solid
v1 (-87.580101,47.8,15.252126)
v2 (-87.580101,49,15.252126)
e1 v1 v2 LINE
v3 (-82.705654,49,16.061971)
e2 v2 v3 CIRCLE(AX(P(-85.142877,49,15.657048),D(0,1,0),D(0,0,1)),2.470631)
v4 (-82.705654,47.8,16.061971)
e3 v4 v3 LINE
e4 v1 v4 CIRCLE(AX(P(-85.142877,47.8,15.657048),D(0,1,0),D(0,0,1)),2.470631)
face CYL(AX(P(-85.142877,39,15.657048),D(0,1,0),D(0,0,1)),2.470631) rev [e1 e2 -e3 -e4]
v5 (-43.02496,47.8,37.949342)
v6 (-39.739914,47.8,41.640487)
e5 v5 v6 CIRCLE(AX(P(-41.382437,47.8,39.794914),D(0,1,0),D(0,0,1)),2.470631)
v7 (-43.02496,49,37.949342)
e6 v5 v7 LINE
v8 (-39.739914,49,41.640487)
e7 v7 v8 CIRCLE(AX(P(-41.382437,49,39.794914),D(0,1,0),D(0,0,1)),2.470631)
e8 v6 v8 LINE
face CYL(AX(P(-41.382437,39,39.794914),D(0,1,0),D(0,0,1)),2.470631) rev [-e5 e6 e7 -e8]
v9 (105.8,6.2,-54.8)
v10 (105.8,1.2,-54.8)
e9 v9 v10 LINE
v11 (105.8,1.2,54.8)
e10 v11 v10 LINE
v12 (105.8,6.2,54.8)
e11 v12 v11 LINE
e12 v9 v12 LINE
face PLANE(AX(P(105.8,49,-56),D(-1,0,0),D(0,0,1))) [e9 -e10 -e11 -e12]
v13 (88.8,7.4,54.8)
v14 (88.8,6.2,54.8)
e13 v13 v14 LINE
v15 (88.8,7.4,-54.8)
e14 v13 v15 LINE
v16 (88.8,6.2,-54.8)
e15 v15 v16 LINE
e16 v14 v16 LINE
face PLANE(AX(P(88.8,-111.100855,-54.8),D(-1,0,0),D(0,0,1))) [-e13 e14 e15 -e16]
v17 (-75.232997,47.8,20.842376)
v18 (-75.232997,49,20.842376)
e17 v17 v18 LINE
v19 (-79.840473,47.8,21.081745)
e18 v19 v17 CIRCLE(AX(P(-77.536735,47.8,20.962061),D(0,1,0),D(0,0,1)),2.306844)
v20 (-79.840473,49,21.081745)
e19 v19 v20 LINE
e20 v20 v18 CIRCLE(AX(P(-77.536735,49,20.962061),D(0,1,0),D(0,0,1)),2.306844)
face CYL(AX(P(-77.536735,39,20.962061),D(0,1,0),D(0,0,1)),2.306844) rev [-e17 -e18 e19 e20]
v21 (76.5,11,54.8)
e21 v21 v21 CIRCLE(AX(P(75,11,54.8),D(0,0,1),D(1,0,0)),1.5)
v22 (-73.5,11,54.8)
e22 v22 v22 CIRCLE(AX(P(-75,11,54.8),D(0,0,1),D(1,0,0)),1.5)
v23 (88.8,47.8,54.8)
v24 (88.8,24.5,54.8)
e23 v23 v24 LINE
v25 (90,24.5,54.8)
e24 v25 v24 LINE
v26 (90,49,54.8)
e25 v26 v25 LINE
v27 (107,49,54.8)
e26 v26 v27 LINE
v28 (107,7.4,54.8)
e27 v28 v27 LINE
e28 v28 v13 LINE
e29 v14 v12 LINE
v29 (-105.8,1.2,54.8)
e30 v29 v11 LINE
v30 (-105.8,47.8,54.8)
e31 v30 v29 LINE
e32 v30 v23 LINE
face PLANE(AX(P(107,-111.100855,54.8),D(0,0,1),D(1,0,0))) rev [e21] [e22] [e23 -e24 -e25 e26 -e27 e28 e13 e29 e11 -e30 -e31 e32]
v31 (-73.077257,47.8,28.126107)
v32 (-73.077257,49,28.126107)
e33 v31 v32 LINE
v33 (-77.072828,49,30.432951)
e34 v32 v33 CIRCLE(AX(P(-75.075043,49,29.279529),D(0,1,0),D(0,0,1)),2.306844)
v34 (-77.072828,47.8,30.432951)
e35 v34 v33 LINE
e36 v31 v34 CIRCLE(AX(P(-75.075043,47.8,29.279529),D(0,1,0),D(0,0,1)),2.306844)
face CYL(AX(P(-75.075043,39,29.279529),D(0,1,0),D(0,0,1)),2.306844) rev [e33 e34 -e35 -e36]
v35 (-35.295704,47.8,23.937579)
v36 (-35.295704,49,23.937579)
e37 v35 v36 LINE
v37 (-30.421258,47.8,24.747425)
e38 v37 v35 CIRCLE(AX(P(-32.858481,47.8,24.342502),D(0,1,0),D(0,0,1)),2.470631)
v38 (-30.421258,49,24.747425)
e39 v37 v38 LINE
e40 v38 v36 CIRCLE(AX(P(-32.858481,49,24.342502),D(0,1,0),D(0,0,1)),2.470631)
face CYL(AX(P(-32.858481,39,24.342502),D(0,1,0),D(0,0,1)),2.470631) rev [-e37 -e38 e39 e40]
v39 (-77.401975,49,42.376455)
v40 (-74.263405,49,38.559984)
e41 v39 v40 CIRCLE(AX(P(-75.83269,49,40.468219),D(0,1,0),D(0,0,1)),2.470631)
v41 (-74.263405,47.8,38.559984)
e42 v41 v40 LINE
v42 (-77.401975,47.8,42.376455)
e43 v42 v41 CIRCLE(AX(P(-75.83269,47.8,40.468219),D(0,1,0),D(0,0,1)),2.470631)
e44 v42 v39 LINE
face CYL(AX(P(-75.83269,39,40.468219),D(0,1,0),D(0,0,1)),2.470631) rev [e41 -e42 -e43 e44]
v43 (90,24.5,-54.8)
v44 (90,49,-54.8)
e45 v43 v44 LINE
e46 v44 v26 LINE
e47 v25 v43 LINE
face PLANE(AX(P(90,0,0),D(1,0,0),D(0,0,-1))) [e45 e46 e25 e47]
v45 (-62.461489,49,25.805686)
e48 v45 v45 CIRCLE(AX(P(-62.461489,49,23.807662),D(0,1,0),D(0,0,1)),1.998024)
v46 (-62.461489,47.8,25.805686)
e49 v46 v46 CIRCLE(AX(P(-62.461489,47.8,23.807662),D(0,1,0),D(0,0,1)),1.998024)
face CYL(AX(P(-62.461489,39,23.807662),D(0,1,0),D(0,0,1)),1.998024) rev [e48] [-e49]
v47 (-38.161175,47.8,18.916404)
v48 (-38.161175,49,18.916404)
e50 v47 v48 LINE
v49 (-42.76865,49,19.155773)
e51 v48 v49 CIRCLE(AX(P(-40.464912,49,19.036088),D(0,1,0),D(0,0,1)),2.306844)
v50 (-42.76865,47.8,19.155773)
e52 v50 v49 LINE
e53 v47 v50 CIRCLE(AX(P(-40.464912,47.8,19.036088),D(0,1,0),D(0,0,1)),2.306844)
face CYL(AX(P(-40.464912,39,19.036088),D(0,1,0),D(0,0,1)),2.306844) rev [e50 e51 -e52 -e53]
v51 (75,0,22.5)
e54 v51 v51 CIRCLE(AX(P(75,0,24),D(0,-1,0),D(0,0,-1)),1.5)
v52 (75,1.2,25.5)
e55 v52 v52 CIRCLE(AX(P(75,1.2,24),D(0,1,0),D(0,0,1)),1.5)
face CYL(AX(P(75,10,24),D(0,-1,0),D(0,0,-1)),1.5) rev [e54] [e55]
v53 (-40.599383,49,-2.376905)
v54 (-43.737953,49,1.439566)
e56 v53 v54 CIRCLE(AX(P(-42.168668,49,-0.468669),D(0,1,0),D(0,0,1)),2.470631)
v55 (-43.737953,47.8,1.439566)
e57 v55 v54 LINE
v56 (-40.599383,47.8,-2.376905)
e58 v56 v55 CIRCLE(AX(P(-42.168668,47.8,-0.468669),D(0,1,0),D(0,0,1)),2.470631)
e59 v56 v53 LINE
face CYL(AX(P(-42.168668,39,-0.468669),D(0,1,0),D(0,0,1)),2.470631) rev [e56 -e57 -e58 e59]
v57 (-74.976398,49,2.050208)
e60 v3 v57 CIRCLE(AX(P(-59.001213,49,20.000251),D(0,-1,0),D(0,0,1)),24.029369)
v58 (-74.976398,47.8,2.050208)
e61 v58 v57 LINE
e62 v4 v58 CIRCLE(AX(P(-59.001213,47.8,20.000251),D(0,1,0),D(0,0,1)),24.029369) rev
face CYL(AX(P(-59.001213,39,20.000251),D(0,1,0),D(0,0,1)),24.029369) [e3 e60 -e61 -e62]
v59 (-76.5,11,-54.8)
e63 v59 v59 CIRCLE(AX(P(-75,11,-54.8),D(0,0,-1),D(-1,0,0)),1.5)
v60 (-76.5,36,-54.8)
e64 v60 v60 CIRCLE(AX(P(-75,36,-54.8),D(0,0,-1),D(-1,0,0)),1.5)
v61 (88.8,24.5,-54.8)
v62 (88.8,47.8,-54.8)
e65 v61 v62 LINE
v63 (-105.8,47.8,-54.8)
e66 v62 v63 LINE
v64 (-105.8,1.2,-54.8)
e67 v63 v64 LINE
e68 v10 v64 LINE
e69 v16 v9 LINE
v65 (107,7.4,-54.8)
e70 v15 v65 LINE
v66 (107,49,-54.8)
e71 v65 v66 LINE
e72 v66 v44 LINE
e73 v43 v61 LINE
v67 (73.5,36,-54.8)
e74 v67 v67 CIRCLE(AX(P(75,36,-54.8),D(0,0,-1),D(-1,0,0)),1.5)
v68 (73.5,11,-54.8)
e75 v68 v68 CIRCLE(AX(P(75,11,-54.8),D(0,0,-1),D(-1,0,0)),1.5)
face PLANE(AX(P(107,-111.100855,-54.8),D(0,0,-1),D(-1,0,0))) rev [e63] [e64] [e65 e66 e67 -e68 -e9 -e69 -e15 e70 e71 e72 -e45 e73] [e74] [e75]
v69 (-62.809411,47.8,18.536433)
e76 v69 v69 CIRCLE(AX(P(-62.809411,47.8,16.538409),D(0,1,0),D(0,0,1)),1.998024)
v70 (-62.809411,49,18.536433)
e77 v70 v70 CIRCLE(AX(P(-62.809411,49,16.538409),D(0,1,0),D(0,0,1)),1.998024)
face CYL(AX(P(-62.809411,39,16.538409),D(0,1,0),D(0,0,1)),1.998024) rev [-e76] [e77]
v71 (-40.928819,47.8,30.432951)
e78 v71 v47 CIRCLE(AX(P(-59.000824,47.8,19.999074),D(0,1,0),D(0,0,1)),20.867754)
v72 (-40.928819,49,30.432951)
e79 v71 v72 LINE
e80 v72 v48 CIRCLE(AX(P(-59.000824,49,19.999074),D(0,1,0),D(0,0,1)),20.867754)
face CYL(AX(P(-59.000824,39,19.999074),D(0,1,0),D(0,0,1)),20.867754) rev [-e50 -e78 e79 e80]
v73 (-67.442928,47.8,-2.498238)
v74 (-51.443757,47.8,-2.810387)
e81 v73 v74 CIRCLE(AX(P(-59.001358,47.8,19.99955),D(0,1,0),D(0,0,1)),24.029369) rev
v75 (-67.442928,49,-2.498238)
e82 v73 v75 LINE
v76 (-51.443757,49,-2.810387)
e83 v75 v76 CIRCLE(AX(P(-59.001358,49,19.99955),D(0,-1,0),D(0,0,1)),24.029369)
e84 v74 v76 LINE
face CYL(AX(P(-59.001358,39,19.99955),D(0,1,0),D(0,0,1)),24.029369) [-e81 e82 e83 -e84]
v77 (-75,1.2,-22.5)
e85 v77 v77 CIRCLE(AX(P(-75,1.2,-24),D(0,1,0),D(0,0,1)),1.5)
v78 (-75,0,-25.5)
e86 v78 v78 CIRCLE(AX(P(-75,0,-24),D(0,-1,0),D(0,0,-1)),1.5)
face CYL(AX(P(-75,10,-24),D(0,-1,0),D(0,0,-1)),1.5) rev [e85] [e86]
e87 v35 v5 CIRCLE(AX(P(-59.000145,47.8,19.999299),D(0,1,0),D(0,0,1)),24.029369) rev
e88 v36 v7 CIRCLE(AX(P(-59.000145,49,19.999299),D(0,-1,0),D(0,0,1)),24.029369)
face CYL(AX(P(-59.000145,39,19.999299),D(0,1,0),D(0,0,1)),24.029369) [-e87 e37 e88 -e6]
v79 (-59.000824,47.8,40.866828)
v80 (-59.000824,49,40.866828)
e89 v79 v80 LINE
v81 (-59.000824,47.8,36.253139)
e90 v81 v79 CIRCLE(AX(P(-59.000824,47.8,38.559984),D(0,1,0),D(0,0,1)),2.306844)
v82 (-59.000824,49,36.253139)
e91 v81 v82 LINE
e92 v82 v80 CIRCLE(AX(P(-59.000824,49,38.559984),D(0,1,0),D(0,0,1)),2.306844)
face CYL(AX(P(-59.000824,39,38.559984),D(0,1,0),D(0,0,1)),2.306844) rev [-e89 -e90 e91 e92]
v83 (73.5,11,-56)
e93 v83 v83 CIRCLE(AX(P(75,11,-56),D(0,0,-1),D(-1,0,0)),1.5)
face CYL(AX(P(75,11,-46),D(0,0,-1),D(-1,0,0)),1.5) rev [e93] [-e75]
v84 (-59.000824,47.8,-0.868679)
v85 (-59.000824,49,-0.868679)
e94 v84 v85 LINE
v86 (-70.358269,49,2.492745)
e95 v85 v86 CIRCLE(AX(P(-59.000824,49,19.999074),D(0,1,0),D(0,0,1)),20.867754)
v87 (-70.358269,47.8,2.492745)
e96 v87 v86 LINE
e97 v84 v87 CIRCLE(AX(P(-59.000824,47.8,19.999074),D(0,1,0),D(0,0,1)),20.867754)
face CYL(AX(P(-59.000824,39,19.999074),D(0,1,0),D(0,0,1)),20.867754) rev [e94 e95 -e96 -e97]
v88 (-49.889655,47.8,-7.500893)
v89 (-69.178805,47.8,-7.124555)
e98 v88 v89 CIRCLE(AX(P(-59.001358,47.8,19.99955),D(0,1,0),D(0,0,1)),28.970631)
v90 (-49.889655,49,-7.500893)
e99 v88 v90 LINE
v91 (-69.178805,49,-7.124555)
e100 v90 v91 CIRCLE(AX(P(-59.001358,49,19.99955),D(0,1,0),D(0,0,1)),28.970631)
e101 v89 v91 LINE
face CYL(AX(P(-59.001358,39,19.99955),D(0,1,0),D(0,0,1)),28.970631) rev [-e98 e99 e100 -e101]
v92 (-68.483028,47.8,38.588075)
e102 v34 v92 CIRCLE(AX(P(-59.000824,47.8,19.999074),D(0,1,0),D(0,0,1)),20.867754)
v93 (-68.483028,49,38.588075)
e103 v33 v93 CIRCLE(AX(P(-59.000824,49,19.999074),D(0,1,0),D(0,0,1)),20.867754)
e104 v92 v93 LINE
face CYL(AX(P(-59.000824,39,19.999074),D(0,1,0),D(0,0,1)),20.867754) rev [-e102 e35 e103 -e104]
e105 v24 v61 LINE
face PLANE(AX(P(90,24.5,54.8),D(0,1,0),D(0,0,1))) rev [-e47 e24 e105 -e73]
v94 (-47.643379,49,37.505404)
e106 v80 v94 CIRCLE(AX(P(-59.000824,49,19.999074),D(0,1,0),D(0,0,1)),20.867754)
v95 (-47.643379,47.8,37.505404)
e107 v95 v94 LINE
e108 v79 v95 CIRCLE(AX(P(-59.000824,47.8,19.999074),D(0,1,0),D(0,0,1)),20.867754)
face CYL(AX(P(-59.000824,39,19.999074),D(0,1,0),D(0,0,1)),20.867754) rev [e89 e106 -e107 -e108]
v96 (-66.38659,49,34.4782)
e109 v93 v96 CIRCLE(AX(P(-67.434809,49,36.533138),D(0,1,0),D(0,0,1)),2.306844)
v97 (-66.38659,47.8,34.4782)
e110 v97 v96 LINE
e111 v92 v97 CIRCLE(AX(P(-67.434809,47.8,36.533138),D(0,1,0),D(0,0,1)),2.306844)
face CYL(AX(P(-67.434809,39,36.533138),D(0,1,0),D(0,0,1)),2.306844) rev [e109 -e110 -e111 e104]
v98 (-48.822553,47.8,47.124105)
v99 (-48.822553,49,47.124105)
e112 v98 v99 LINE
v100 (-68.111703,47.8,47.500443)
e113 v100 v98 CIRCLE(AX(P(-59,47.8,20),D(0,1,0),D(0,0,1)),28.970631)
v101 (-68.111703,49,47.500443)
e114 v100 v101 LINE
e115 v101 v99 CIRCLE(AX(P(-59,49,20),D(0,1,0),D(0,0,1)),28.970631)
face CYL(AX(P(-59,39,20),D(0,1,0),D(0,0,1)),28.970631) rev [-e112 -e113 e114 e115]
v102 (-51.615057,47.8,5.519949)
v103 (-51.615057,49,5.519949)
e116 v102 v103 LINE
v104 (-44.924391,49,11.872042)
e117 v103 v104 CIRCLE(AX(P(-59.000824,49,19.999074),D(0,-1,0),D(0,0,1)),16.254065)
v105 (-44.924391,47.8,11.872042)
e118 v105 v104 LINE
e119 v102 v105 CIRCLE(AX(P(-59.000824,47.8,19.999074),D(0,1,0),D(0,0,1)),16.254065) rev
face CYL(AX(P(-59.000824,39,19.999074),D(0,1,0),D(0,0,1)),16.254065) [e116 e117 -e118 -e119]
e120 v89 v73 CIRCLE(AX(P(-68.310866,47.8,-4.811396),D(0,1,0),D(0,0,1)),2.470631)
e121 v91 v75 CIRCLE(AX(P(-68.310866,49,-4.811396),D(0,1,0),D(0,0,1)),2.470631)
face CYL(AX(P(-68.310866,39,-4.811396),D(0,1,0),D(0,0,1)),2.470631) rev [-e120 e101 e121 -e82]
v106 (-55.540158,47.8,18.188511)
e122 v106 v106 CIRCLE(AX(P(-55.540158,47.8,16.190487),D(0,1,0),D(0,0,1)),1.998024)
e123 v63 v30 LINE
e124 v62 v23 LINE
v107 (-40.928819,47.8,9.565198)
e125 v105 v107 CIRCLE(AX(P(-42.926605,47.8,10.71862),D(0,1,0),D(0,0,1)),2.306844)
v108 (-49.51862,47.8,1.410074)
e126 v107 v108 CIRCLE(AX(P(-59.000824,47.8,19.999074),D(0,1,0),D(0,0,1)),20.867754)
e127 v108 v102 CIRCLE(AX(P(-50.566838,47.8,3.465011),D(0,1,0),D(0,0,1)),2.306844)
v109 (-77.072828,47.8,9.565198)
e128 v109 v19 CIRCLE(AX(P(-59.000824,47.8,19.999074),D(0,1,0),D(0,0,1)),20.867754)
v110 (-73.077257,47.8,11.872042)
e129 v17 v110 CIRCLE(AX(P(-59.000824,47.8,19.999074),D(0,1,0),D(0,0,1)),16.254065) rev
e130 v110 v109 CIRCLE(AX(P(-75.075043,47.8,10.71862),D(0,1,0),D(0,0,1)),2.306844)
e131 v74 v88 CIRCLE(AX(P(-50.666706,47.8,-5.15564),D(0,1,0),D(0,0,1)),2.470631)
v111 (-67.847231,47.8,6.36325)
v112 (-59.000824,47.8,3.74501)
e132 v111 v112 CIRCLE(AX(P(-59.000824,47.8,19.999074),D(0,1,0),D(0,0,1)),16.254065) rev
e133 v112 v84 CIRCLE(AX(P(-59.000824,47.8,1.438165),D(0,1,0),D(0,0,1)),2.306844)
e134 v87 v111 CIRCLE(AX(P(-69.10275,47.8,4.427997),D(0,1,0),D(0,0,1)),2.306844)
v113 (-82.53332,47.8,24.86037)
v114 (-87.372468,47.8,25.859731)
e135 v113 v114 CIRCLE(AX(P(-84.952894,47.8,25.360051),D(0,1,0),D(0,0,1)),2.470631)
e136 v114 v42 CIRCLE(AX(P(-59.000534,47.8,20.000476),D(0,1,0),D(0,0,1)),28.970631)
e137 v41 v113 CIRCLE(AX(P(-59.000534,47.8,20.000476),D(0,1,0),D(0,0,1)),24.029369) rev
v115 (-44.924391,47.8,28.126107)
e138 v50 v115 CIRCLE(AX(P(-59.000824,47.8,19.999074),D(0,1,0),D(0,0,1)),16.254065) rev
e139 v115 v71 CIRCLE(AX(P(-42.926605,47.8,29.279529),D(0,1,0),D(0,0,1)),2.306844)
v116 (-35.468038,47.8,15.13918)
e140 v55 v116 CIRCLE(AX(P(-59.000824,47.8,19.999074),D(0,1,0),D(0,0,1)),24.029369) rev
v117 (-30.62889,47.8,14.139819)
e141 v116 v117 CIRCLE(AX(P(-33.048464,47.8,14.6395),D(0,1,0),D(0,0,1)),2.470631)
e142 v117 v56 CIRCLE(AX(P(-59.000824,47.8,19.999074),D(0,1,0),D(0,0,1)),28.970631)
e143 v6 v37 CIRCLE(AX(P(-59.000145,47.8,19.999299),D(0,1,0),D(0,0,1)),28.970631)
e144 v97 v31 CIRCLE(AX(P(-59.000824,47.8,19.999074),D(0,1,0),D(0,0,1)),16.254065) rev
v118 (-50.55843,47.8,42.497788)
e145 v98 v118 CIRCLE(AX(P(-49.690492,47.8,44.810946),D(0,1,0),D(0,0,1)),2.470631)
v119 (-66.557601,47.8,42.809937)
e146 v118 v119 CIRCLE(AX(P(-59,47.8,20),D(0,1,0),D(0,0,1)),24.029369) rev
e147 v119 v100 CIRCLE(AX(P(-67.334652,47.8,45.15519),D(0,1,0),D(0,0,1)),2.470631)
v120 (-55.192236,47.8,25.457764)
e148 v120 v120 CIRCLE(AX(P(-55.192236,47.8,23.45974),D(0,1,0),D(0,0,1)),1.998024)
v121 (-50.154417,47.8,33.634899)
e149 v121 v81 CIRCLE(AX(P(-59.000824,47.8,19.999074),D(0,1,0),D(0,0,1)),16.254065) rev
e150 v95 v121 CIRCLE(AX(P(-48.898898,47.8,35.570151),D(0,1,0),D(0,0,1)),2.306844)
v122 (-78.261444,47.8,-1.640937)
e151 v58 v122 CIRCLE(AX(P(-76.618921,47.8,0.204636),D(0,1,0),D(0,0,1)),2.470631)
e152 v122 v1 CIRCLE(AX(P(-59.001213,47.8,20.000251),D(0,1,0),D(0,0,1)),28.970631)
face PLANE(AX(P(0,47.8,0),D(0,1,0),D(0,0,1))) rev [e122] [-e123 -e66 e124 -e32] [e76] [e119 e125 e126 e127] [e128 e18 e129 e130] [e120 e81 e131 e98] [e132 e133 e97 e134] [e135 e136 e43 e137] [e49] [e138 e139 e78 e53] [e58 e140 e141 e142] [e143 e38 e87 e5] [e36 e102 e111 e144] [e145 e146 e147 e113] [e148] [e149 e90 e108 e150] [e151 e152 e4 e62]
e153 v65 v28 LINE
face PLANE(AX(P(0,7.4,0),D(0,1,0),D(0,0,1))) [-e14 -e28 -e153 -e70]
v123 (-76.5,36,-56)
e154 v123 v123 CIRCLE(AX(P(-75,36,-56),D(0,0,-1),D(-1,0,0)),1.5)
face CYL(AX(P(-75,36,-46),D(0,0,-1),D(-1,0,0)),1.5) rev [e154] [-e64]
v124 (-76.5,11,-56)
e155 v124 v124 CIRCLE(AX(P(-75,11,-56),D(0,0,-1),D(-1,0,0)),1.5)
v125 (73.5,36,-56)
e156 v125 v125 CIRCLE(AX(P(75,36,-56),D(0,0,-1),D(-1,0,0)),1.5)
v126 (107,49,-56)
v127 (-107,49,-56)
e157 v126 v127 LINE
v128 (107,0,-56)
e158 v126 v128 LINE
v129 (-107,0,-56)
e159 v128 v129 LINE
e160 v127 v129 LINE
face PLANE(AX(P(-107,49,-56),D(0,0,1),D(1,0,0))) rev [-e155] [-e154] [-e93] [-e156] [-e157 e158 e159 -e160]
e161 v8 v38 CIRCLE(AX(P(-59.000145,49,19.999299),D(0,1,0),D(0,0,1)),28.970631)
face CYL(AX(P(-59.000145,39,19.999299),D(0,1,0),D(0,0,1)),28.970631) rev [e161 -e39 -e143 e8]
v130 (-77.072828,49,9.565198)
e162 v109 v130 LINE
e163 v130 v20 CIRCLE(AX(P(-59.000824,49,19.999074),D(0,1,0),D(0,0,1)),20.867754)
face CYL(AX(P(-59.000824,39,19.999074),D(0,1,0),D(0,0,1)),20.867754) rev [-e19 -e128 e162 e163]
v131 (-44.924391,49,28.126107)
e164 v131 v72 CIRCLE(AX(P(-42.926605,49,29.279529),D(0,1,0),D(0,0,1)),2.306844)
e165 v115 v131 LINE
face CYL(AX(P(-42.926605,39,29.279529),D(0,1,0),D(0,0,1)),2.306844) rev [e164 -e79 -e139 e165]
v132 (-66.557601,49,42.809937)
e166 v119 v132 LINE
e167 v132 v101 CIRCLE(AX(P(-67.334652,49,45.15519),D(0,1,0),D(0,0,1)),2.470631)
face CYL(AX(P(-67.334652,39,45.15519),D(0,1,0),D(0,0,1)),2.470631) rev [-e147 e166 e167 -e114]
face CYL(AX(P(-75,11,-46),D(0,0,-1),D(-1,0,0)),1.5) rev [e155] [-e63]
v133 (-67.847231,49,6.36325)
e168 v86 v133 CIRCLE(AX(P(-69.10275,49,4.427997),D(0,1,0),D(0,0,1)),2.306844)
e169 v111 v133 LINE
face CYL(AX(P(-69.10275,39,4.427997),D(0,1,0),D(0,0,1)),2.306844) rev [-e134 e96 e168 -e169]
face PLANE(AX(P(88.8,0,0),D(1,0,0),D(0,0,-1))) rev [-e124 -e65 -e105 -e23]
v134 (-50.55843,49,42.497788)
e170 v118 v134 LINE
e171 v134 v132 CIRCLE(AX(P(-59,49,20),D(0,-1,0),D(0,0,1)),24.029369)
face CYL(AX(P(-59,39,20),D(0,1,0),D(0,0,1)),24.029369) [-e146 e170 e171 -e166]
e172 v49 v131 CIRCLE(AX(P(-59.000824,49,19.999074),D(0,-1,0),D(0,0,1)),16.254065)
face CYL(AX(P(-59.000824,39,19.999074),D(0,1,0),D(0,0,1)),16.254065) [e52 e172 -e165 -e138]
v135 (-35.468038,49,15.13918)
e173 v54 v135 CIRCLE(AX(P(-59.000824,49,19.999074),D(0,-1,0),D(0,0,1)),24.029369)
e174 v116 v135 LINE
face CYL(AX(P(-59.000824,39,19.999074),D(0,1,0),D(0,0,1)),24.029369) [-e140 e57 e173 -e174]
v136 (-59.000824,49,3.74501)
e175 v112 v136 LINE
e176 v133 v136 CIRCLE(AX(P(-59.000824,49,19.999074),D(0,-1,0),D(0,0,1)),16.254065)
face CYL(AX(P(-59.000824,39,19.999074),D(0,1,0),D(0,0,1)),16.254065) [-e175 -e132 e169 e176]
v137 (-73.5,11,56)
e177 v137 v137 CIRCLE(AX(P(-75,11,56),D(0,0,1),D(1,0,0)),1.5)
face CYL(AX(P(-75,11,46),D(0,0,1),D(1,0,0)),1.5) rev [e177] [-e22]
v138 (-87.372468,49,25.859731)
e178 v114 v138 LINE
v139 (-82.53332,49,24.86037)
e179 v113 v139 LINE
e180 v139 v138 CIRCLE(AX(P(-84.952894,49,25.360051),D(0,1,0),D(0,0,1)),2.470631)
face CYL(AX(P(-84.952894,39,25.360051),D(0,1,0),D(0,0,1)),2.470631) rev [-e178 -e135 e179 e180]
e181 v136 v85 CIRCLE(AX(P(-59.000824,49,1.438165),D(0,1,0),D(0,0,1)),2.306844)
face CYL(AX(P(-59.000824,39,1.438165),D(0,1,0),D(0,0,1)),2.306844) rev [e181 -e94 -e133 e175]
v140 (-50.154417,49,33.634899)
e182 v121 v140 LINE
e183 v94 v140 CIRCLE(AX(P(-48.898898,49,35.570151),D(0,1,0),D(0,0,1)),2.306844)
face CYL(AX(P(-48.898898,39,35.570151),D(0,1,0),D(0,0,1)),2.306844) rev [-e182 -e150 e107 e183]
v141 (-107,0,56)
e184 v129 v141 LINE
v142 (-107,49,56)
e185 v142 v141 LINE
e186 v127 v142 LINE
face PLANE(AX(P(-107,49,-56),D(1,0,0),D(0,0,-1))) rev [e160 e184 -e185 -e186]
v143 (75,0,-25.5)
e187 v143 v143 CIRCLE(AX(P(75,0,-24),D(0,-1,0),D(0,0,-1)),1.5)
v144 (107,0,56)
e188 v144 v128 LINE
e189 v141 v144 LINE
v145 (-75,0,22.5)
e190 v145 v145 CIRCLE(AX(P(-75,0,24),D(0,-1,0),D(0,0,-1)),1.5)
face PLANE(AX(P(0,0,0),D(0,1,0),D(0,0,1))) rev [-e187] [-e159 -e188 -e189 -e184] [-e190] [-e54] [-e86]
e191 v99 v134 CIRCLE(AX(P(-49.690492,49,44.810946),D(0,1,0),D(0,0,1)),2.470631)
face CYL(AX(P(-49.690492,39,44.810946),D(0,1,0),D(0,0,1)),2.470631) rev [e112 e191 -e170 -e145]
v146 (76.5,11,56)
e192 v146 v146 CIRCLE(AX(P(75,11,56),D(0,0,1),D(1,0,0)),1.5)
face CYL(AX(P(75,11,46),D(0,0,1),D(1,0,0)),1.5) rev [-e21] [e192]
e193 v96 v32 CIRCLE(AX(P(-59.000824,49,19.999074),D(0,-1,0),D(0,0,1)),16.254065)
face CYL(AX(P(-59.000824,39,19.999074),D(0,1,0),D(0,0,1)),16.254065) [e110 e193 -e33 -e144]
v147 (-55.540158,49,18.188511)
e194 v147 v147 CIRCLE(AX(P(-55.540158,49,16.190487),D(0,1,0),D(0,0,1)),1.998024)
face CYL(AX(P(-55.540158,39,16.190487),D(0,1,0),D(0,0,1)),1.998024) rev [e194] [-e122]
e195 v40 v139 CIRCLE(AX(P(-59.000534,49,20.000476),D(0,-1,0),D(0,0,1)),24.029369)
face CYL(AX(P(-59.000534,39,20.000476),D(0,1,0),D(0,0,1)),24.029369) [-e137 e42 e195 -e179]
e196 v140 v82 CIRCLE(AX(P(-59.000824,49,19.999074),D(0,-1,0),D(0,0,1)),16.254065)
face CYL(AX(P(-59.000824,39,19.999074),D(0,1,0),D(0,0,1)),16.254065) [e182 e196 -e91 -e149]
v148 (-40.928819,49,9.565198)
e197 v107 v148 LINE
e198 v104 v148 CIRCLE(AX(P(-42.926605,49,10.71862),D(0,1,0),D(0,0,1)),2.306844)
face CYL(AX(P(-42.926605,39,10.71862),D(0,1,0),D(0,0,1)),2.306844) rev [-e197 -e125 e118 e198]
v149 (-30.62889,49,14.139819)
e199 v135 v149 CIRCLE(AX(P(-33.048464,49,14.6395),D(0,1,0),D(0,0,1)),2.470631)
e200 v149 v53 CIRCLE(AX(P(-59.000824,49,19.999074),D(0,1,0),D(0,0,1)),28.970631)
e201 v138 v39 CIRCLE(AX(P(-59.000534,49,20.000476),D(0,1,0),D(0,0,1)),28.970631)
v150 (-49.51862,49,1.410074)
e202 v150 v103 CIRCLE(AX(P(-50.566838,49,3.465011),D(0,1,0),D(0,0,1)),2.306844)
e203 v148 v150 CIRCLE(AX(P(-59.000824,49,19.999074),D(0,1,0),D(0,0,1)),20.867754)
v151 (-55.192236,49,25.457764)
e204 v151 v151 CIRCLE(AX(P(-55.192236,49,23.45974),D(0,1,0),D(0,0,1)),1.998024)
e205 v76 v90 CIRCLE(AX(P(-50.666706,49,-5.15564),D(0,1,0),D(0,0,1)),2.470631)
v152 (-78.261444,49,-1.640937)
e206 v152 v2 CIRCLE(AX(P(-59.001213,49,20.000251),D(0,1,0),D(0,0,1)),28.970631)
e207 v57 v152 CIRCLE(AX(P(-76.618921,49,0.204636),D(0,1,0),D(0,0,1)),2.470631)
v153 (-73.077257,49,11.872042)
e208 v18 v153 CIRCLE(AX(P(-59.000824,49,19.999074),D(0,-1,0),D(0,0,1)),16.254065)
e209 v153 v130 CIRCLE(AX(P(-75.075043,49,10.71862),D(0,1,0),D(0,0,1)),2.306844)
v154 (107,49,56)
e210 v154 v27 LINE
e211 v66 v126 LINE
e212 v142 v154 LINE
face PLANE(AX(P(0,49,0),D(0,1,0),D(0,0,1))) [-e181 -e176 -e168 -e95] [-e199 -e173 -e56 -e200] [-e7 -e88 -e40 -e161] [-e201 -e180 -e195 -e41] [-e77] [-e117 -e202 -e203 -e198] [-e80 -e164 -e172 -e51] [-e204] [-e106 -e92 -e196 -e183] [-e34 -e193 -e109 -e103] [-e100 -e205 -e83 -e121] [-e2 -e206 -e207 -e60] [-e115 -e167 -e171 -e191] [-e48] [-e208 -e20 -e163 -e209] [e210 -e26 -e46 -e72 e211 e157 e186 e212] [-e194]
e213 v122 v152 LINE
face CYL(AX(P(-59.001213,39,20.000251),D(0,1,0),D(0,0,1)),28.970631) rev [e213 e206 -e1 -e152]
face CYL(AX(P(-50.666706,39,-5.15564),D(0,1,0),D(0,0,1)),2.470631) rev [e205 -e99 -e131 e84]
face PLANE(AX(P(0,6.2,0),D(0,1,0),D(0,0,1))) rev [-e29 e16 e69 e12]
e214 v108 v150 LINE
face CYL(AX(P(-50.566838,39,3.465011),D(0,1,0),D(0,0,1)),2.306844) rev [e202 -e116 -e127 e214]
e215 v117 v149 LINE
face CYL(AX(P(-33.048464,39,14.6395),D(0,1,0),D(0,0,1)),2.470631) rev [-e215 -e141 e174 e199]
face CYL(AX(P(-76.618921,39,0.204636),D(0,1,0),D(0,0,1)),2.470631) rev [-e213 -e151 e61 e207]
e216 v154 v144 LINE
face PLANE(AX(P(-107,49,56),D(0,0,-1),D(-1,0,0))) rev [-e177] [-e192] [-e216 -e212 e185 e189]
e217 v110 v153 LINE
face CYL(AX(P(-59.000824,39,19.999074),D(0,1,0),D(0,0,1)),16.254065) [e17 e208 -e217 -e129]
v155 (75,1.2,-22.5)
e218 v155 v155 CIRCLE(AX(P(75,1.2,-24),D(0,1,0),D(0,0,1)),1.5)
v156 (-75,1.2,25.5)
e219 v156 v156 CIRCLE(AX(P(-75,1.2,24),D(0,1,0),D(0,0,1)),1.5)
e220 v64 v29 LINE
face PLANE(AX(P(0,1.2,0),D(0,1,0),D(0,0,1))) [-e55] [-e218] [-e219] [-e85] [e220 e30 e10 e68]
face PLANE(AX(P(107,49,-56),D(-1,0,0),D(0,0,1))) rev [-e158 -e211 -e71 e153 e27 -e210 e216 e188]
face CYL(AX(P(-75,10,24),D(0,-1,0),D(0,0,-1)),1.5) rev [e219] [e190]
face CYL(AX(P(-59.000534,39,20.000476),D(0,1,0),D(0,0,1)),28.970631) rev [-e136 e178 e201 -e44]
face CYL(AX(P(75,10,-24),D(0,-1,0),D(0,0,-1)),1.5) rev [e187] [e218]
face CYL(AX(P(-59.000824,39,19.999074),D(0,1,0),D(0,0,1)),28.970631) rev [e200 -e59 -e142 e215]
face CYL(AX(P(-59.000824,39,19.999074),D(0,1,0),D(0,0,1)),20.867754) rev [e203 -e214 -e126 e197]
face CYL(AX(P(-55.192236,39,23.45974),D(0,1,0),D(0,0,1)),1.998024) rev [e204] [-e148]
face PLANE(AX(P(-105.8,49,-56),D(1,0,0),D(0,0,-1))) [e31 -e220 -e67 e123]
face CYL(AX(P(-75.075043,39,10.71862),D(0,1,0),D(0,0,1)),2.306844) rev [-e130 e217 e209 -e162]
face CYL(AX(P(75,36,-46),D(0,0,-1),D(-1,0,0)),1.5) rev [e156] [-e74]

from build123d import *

# Parameters (mm, degrees)
SKETCH1_W           = 214
SKETCH1_H           = 112
BOSS_EXTRUDE1_DEPTH = 49
SKETCH2_W           = 18.2
SKETCH2_H           = 109.6
CUT_EXTRUDE1_DEPTH  = 41.6
SHELL1_START        = -54.8
SHELL1_DEPTH        = 109.6
SKETCH3_R           = 1.5
CUT_EXTRUDE2_DEPTH  = 10
CUT_EXTRUDE3_START  = -10
SKETCH4_R           = 1.5
CUT_EXTRUDE3_DEPTH  = 10
SKETCH5_W           = 109.6
SKETCH5_H           = 24.5
BOSS_EXTRUDE2_DEPTH = 1.2
SKETCH6_R           = 1.998023928
CUT_EXTRUDE5_DEPTH  = 10
SKETCH7_R           = 1.5
CUT_EXTRUDE6_DEPTH  = 10


# Read off the part's stored shape, not the designer's step: Shell1
with BuildPart() as part:
    # Sketch1 → Boss-Extrude1 (new body)
    with BuildSketch(Plane(origin=(0, 0, 0), x_dir=(1, 0, 0), z_dir=(0, 1, 0))):
        Rectangle(SKETCH1_W, SKETCH1_H)
    extrude(amount=BOSS_EXTRUDE1_DEPTH)

    # Sketch2 → Cut-Extrude1 (cut)
    with BuildSketch(Plane(origin=(0, 49, 0), x_dir=(1, 0, 0), z_dir=(0, 1, 0))):
        with Locations((97.9, 0)):
            Rectangle(SKETCH2_W, SKETCH2_H)
    extrude(amount=-CUT_EXTRUDE1_DEPTH, mode=Mode.SUBTRACT)

    # Shell1 outline → Shell1 (cut)
    with BuildSketch(Plane.XY.offset(SHELL1_START)):
        Polygon((88.8, 6.2), (88.8, 47.8), (-105.8, 47.8), (-105.8, 1.2), (105.8, 1.2), (105.8, 6.2), align=None)
    extrude(amount=SHELL1_DEPTH, mode=Mode.SUBTRACT)

    # Sketch3 → Cut-Extrude2 (cut)
    with BuildSketch(Plane.XY.offset(56)):
        with Locations((75, 11)):
            Circle(SKETCH3_R)
        with Locations((-75, 11)):
            Circle(SKETCH3_R)
    extrude(amount=-CUT_EXTRUDE2_DEPTH, mode=Mode.SUBTRACT)

    # Sketch4 → Cut-Extrude3 (cut)
    with BuildSketch(Plane(origin=(0, 0, -56), x_dir=(-1, 0, 0), z_dir=(0, 0, -1)).offset(CUT_EXTRUDE3_START)):
        with Locations(Location((-75, 11, 0), (0, 0, 180))):
            Circle(SKETCH4_R)
        with Locations((-75, 36)):
            Circle(SKETCH4_R)
        with Locations((75, 36)):
            Circle(SKETCH4_R)
        with Locations(Location((75, 11, 0), (0, 0, 180))):
            Circle(SKETCH4_R)
    extrude(amount=CUT_EXTRUDE3_DEPTH, mode=Mode.SUBTRACT)

    # Sketch5 → Boss-Extrude2 (add)
    with BuildSketch(Plane(origin=(88.8, 0, 0), x_dir=(0, 0, -1), z_dir=(1, 0, 0))):
        with Locations((0, 36.75)):
            Rectangle(SKETCH5_W, SKETCH5_H)
    extrude(amount=BOSS_EXTRUDE2_DEPTH)

    # Sketch6 → Cut-Extrude5 (cut)
    with BuildSketch(Plane(origin=(0, 49, 0), x_dir=(1, 0, 0), z_dir=(0, 1, 0))):
        with Locations(Location((-55.192236422, -23.459739828, 0), (0, 0, 270))):
            Circle(SKETCH6_R)
        with Locations(Location((-62.461489091, -23.807661774, 0), (0, 0, 270))):
            Circle(SKETCH6_R)
        with Locations(Location((-62.809411037, -16.538409104, 0), (0, 0, 270))):
            Circle(SKETCH6_R)
        with Locations(Location((-55.540158368, -16.190487158, 0), (0, 0, 270))):
            Circle(SKETCH6_R)
        with BuildLine():
            ThreePointArc((-68.111702611, -47.500442825), (-58.4348804, -48.96511902), (-48.822553365, -47.124104778))
            ThreePointArc((-48.822553365, -47.124104778), (-47.37733306, -43.943008007), (-50.558429832, -42.497787702))
            ThreePointArc((-50.558429832, -42.497787702), (-58.531267819, -44.024796535), (-66.557600615, -42.809937118))
            ThreePointArc((-66.557600615, -42.809937118), (-69.679904466, -44.378138973), (-68.111702611, -47.500442825))
        make_face()
        with BuildLine():
            ThreePointArc((-87.372467764, -25.85973106), (-83.802503452, -34.97244302), (-77.401974833, -42.376455301))
            ThreePointArc((-77.401974833, -42.376455301), (-73.924454064, -42.037504413), (-74.263404952, -38.559983645))
            ThreePointArc((-74.263404952, -38.559983645), (-79.572252387, -32.418807824), (-82.533319668, -24.860370016))
            ThreePointArc((-82.533319668, -24.860370016), (-85.452574238, -22.940476489), (-87.372467764, -25.85973106))
        make_face()
        with BuildLine():
            ThreePointArc((-78.261444197, 1.640936741), (-84.368302096, -6.007099023), (-87.580100511, -15.252125546))
            ThreePointArc((-87.580100511, -15.252125546), (-85.547800047, -18.09427143), (-82.705654164, -16.061970966))
            ThreePointArc((-82.705654164, -16.061970966), (-80.041663611, -8.393786313), (-74.976398096, -2.050207921))
            ThreePointArc((-74.976398096, -2.050207921), (-74.773348815, 1.437887461), (-78.261444197, 1.640936741))
        make_face()
        with BuildLine():
            ThreePointArc((-49.889655476, 7.500892778), (-59.566477687, 8.965568974), (-69.178804722, 7.124554732))
            ThreePointArc((-69.178804722, 7.124554732), (-70.624025026, 3.94345796), (-67.442928255, 2.498237655))
            ThreePointArc((-67.442928255, 2.498237655), (-59.470090268, 4.025246488), (-51.443757472, 2.810387072))
            ThreePointArc((-51.443757472, 2.810387072), (-48.321453621, 4.378588927), (-49.889655476, 7.500892778))
        make_face()
        with BuildLine():
            ThreePointArc((-30.628890323, -14.139818987), (-34.198854634, -5.027107026), (-40.599383254, 2.376905254))
            ThreePointArc((-40.599383254, 2.376905254), (-44.076904022, 2.037954367), (-43.737953135, -1.439566401))
            ThreePointArc((-43.737953135, -1.439566401), (-38.4291057, -7.580742222), (-35.468038419, -15.139180031))
            ThreePointArc((-35.468038419, -15.139180031), (-32.548783849, -17.059073557), (-30.628890323, -14.139818987))
        make_face()
        with BuildLine():
            ThreePointArc((-39.73991389, -41.640486788), (-33.633055991, -33.992451023), (-30.421257576, -24.7474245))
            ThreePointArc((-30.421257576, -24.7474245), (-32.453558039, -21.905278617), (-35.295703923, -23.93757908))
            ThreePointArc((-35.295703923, -23.93757908), (-37.959694476, -31.605763734), (-43.02495999, -37.949342126))
            ThreePointArc((-43.02495999, -37.949342126), (-43.228009271, -41.437437507), (-39.73991389, -41.640486788))
        make_face()
        with BuildLine():
            ThreePointArc((-59.000823729, -40.866828037), (-53.078604467, -40.008833538), (-47.643378837, -37.505404311))
            ThreePointArc((-47.643378837, -37.505404311), (-46.963644877, -34.314632642), (-50.154416546, -33.634898681))
            ThreePointArc((-50.154416546, -33.634898681), (-54.387958467, -35.584840284), (-59.000823729, -36.253139252))
            ThreePointArc((-59.000823729, -36.253139252), (-61.307668122, -38.559983645), (-59.000823729, -40.866828037))
        make_face()
        with BuildLine():
            ThreePointArc((-77.072828442, -30.432951252), (-73.368673779, -35.13274633), (-68.483027656, -38.588075187))
            ThreePointArc((-68.483027656, -38.588075187), (-65.379871353, -37.58135623), (-66.38659031, -34.478199926))
            ThreePointArc((-66.38659031, -34.478199926), (-70.192060234, -31.786815877), (-73.077256749, -28.126106859))
            ThreePointArc((-73.077256749, -28.126106859), (-76.228464792, -27.281743209), (-77.072828442, -30.432951252))
        make_face()
        with BuildLine():
            ThreePointArc((-77.072828442, -9.56519768), (-79.290893041, -15.122987258), (-79.840472548, -21.081745342))
            ThreePointArc((-79.840472548, -21.081745342), (-77.417050205, -23.265798054), (-75.232997493, -20.842375711))
            ThreePointArc((-75.232997493, -20.842375711), (-74.804925497, -16.201050059), (-73.077256749, -11.872042073))
            ThreePointArc((-73.077256749, -11.872042073), (-73.921620399, -8.72083403), (-77.072828442, -9.56519768))
        make_face()
        with BuildLine():
            ThreePointArc((-59.000823729, 0.868679105), (-64.923042991, 0.010684606), (-70.358268622, -2.492744621))
            ThreePointArc((-70.358268622, -2.492744621), (-71.038002582, -5.68351629), (-67.847230912, -6.36325025))
            ThreePointArc((-67.847230912, -6.36325025), (-63.613688992, -4.413308647), (-59.000823729, -3.74500968))
            ThreePointArc((-59.000823729, -3.74500968), (-56.693979337, -1.438165287), (-59.000823729, 0.868679105))
        make_face()
        with BuildLine():
            ThreePointArc((-40.928819017, -9.56519768), (-44.63297368, -4.865402602), (-49.518619803, -1.410073745))
            ThreePointArc((-49.518619803, -1.410073745), (-52.621776106, -2.416792702), (-51.615057149, -5.519949006))
            ThreePointArc((-51.615057149, -5.519949006), (-47.809587225, -8.211333055), (-44.92439071, -11.872042073))
            ThreePointArc((-44.92439071, -11.872042073), (-41.773182667, -12.716405723), (-40.928819017, -9.56519768))
        make_face()
        with BuildLine():
            ThreePointArc((-40.928819017, -30.432951252), (-38.710754418, -24.875161674), (-38.161174911, -18.91640359))
            ThreePointArc((-38.161174911, -18.91640359), (-40.584597254, -16.732350878), (-42.768649966, -19.155773221))
            ThreePointArc((-42.768649966, -19.155773221), (-43.196721962, -23.797098873), (-44.92439071, -28.126106859))
            ThreePointArc((-44.92439071, -28.126106859), (-44.080027059, -31.277314902), (-40.928819017, -30.432951252))
        make_face()
    extrude(amount=-CUT_EXTRUDE5_DEPTH, mode=Mode.SUBTRACT)

    # Sketch7 → Cut-Extrude6 (cut)
    with BuildSketch(Plane.XZ):
        with Locations(Location((-75, 24, 0), (0, 0, 270))):
            Circle(SKETCH7_R)
        with Locations(Location((75, 24, 0), (0, 0, 270))):
            Circle(SKETCH7_R)
        with Locations(Location((75, -24, 0), (0, 0, 270))):
            Circle(SKETCH7_R)
        with Locations(Location((-75, -24, 0), (0, 0, 270))):
            Circle(SKETCH7_R)
    extrude(amount=-CUT_EXTRUDE6_DEPTH, mode=Mode.SUBTRACT)


solid = part.part
